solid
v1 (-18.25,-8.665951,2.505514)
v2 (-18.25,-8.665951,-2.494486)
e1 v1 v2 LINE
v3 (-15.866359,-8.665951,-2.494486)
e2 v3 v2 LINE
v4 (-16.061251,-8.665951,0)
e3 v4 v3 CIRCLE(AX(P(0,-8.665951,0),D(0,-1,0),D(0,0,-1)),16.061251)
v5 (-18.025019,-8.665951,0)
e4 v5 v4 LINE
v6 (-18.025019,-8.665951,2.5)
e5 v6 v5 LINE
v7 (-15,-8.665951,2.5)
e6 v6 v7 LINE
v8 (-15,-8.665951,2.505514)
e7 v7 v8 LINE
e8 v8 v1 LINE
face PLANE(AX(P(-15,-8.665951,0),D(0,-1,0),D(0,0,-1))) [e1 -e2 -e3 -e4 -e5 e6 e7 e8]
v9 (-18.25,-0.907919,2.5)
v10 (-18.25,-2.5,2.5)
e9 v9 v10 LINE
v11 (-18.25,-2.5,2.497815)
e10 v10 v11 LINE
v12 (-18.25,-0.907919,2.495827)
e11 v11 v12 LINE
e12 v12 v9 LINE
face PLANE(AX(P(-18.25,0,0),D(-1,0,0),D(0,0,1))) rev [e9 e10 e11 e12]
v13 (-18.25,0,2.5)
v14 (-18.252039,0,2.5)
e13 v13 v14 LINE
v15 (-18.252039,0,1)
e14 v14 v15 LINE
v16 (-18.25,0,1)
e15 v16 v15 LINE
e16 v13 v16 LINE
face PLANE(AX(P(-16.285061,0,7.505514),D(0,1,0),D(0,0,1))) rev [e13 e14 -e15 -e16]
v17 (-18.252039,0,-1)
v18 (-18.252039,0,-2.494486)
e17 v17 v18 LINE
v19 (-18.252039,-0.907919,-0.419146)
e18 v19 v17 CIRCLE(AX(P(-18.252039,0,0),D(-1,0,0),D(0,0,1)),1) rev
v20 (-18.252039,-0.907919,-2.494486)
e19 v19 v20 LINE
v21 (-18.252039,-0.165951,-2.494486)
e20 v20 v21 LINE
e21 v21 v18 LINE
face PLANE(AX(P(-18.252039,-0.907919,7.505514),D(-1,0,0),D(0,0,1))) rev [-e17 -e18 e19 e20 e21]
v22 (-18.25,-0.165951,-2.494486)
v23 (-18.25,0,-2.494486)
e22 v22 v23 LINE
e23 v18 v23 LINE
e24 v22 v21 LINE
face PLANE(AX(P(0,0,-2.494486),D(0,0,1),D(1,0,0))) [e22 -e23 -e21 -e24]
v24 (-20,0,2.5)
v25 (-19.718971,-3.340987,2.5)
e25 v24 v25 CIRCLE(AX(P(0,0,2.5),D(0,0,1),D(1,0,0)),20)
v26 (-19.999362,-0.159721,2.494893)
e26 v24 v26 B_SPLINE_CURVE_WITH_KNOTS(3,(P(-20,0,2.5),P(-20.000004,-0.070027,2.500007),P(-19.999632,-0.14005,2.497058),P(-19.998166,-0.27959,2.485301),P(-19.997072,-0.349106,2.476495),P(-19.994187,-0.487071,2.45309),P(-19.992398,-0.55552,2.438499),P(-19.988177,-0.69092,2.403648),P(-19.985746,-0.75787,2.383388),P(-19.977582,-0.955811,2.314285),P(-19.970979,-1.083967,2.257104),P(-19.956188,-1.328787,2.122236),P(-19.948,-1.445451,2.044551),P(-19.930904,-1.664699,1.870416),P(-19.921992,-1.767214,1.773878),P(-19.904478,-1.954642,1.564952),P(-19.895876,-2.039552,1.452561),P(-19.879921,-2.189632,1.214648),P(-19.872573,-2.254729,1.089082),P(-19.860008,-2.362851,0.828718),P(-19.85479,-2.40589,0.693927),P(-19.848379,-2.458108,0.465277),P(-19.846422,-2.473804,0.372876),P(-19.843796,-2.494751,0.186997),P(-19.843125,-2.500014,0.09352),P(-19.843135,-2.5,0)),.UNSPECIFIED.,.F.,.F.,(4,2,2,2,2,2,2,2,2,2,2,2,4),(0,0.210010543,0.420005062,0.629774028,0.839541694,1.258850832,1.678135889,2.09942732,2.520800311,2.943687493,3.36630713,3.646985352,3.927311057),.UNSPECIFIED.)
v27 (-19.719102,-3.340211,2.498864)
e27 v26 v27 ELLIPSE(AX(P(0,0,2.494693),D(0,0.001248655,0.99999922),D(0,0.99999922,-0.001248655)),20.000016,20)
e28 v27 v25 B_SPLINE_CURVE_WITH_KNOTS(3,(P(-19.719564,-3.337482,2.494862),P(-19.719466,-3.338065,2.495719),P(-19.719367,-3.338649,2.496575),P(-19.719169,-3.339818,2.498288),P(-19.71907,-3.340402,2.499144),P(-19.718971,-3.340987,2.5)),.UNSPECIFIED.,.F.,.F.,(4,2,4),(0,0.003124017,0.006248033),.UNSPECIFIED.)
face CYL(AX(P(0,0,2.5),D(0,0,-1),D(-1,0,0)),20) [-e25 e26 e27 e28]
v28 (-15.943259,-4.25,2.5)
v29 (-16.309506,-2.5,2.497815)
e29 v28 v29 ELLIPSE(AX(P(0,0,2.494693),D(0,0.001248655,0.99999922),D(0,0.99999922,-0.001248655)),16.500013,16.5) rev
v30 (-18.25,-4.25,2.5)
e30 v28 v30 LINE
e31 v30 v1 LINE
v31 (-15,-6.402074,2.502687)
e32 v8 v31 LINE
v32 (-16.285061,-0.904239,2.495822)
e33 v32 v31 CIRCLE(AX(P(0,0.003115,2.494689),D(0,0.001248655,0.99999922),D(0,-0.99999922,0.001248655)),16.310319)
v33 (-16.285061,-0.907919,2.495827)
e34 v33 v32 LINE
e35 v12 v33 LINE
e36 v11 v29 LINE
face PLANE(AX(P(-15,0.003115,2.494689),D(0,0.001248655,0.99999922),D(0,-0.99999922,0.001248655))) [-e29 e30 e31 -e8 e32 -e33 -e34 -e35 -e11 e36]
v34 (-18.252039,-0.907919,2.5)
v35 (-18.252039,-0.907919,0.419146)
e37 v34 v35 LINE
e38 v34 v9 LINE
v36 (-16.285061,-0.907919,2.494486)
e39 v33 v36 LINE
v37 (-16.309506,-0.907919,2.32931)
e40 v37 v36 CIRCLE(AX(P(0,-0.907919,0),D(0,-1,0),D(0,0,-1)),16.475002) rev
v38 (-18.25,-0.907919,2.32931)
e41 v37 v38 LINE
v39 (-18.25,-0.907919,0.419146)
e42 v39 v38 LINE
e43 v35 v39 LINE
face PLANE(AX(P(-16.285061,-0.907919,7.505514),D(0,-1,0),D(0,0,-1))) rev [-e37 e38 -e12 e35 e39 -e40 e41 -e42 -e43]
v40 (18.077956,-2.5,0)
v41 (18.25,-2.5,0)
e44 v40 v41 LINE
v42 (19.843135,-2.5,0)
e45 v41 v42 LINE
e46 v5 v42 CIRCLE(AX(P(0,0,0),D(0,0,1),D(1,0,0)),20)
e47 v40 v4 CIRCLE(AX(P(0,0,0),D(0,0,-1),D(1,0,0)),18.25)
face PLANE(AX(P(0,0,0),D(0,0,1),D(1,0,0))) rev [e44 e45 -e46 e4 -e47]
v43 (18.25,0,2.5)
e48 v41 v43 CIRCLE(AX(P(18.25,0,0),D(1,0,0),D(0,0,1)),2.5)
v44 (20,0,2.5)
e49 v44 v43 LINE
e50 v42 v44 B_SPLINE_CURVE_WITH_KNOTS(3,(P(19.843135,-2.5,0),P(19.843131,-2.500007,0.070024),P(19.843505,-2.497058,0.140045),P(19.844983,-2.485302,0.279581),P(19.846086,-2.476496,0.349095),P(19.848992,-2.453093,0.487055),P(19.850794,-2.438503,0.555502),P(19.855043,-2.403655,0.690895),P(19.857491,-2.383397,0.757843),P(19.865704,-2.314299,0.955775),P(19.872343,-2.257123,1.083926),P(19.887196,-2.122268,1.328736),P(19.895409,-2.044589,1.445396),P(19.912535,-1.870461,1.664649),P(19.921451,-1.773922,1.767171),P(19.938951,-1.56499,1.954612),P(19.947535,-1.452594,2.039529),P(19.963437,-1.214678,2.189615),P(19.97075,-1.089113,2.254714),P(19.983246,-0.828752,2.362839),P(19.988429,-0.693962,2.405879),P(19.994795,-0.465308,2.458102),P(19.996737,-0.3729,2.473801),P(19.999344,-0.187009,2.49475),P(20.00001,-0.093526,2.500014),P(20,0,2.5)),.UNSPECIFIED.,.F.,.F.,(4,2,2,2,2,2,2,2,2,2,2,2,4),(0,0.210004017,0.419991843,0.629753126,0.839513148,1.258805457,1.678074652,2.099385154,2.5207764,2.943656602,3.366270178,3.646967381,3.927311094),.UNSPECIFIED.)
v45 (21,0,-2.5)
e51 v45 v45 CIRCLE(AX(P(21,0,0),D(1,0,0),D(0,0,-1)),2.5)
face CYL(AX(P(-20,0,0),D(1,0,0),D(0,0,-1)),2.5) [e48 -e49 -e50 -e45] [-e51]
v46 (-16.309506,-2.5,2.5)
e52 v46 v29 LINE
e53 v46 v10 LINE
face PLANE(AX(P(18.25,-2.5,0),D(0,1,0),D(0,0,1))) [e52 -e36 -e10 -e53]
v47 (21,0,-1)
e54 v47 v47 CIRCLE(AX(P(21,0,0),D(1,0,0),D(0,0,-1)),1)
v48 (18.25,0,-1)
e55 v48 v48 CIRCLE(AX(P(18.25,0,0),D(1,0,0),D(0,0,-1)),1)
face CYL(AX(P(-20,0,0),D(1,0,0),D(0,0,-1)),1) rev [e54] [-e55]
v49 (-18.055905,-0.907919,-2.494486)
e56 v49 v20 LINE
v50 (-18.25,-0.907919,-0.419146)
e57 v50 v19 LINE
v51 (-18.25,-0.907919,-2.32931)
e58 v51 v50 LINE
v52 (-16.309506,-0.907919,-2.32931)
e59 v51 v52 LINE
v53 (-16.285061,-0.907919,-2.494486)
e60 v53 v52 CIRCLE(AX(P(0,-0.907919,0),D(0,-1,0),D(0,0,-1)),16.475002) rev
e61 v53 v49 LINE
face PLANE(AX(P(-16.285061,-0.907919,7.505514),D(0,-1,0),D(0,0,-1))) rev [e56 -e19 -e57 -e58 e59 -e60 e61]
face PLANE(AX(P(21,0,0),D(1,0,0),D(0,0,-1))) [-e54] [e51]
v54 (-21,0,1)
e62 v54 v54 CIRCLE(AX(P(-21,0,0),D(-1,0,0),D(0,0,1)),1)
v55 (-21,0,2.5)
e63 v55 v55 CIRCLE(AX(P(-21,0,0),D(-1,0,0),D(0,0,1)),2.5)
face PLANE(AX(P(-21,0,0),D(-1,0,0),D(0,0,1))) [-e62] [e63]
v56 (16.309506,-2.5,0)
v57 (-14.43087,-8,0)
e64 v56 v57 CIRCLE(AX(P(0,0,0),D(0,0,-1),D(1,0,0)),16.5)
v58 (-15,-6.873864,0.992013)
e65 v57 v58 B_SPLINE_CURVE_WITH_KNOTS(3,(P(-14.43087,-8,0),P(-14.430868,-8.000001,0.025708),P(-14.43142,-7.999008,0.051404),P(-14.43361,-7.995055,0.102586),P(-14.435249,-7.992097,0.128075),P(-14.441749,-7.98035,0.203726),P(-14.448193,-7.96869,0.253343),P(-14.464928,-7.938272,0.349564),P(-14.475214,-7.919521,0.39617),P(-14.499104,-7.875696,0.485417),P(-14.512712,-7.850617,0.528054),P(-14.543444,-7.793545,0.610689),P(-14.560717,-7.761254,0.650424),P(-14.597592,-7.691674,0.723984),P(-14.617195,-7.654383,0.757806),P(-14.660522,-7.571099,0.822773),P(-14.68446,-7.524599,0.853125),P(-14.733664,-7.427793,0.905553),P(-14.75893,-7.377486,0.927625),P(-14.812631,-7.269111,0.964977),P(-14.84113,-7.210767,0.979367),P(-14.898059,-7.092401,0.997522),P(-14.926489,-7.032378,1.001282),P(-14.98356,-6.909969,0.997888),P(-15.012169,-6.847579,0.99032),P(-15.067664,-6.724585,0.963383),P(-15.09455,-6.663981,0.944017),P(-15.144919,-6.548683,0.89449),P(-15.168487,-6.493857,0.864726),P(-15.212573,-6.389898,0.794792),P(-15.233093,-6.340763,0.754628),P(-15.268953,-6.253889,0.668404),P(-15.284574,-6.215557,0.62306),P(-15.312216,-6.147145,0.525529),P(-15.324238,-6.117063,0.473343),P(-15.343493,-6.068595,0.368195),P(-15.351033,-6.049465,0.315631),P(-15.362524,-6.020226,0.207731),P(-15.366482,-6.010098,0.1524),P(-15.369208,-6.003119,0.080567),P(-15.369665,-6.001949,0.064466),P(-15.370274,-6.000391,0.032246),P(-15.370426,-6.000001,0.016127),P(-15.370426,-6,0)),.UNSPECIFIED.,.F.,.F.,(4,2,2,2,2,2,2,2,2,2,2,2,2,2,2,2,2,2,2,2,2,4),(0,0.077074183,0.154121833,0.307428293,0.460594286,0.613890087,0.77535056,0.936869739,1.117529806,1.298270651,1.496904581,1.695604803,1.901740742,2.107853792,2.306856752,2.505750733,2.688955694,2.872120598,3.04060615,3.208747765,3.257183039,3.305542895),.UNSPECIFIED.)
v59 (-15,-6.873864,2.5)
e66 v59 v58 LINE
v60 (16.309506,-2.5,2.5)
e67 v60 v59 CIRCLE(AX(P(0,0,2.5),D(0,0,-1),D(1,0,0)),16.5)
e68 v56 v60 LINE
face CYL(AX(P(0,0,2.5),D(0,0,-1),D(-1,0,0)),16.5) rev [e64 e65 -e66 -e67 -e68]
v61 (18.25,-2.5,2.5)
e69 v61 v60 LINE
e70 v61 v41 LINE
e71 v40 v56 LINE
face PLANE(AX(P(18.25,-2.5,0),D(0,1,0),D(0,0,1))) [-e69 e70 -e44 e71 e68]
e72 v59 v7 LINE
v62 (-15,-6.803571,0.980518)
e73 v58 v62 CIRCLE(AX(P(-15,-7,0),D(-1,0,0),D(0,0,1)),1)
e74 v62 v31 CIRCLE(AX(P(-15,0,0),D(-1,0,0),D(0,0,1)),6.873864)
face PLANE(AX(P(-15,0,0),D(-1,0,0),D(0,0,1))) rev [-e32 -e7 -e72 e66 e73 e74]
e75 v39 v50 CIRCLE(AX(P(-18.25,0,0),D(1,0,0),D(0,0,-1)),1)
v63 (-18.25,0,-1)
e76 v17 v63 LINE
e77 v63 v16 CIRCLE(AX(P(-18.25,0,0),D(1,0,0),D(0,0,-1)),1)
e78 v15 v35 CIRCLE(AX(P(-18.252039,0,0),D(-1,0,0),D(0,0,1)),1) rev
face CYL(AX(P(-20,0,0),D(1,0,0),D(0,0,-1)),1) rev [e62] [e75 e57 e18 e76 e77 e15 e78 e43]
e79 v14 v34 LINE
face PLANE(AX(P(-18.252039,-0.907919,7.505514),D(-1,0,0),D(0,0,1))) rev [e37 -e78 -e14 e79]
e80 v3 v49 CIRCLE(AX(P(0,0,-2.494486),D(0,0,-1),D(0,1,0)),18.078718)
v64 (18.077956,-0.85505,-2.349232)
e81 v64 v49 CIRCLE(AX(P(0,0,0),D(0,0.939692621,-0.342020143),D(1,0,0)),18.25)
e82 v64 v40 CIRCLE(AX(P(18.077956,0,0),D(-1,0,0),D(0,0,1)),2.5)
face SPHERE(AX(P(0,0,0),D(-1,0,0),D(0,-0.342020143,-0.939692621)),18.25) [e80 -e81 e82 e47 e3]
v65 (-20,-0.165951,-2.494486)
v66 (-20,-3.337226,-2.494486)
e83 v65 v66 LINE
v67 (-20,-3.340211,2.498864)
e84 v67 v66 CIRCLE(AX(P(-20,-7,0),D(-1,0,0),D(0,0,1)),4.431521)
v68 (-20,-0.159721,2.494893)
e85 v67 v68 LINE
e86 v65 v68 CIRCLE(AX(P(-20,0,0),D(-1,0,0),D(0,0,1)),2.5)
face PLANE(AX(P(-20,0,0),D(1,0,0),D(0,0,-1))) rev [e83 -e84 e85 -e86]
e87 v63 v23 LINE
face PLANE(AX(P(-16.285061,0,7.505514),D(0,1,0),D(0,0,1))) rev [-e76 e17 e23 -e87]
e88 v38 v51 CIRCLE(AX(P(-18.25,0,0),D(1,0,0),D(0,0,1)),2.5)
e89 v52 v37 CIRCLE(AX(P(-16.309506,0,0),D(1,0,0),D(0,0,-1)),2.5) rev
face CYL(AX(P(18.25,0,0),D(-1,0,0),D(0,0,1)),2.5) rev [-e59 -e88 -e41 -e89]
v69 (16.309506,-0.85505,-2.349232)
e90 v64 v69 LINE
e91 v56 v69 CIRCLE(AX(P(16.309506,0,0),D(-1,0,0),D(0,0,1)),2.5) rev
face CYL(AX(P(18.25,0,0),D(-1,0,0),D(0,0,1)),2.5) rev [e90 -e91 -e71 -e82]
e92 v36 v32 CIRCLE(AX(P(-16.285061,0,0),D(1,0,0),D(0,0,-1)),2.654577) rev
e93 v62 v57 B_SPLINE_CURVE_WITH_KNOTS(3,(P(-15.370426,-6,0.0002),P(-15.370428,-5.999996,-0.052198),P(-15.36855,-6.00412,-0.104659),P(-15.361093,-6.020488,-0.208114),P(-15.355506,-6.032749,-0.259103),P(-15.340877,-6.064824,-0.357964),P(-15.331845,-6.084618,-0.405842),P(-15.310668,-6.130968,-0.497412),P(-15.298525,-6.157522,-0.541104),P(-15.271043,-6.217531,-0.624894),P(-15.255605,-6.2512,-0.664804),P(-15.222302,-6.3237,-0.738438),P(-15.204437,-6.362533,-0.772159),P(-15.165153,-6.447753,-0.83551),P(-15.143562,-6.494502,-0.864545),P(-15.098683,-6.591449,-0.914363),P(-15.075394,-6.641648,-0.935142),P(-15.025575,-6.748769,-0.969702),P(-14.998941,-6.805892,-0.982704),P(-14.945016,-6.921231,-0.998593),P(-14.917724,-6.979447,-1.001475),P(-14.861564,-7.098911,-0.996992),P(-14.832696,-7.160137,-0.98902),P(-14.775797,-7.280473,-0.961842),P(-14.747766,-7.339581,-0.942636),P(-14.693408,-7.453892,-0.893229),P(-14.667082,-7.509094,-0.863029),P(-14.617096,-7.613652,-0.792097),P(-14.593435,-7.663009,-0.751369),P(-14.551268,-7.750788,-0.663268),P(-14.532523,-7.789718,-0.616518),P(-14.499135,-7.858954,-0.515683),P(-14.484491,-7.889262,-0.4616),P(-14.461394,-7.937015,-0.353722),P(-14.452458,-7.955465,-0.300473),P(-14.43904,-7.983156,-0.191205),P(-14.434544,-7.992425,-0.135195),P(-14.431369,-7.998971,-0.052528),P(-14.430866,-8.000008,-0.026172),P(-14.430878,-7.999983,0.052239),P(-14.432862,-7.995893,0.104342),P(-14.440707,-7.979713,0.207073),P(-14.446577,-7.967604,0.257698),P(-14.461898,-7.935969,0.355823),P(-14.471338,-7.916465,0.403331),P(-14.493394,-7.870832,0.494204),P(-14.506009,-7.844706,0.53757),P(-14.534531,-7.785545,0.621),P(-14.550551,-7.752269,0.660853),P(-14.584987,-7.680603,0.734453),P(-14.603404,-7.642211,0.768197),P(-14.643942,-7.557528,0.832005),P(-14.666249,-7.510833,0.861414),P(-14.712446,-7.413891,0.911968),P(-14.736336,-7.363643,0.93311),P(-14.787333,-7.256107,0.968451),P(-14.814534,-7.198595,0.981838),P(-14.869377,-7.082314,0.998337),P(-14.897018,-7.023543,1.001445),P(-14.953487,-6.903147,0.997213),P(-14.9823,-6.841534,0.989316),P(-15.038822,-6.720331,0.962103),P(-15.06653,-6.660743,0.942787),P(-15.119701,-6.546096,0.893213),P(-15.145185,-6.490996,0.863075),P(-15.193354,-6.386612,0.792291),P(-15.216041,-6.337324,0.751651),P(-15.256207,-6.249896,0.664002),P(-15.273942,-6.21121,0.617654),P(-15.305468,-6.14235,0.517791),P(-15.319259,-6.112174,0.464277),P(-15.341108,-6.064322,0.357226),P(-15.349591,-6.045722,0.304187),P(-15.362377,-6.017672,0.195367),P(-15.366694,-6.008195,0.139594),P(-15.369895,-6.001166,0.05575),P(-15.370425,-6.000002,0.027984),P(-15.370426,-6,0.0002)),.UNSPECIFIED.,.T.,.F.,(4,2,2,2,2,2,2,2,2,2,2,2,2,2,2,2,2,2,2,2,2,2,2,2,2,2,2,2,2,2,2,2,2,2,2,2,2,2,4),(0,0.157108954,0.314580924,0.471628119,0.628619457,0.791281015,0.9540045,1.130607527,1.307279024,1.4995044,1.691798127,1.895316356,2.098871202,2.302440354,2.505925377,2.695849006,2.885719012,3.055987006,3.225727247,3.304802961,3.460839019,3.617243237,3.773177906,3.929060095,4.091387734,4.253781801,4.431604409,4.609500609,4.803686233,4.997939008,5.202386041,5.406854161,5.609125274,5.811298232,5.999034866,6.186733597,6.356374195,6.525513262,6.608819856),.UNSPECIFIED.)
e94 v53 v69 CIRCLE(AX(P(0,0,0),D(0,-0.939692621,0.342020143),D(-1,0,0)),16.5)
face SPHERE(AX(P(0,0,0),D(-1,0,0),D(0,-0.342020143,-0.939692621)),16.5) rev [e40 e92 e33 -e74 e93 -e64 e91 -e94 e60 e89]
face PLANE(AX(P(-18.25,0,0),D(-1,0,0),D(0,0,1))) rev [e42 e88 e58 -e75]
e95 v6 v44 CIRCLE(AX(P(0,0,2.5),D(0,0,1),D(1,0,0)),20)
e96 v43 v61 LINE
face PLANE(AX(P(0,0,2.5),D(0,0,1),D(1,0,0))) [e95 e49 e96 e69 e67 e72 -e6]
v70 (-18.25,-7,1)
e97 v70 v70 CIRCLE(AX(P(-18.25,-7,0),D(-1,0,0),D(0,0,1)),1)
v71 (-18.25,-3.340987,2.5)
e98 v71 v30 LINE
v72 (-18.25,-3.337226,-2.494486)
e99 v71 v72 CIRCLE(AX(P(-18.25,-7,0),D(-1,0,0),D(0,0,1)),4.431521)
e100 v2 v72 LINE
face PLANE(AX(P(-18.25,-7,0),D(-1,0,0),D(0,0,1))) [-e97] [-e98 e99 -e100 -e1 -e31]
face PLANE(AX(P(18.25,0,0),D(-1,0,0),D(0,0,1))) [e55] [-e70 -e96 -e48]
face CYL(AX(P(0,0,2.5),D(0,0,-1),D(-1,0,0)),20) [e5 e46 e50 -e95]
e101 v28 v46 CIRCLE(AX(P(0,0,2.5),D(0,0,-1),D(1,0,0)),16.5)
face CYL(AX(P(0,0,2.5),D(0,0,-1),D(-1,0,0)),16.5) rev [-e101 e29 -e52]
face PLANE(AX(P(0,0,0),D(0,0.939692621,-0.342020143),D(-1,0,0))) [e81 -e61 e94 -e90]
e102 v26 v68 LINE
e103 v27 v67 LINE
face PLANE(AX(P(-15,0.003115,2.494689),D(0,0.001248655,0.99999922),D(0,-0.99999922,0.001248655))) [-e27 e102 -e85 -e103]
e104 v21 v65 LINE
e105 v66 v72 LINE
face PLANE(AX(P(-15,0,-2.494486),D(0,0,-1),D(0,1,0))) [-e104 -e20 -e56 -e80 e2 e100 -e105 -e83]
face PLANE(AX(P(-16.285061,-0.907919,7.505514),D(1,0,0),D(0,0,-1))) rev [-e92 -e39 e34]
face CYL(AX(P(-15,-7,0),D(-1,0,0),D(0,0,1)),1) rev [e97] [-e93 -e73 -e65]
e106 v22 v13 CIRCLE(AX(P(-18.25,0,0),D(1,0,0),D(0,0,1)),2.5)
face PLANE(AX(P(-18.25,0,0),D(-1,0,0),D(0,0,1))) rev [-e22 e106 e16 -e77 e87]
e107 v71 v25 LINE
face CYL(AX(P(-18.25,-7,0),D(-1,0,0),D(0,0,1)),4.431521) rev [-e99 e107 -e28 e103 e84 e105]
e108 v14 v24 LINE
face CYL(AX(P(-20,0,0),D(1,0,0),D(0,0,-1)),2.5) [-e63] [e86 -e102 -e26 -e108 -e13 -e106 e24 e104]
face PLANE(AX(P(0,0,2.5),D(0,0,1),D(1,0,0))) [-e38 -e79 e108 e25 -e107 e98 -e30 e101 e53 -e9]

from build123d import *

# Parameters (mm, degrees)
EXTRUDE_1_DEPTH          = 2.5
REVOLVE_1_ANGLE          = 70
EXTRUDE_2_DEPTH          = 20
EXTRUDE_2_DEPTH_BACK     = 20
SKETCH_4_R               = 2.5
SKETCH_4_R_2             = 1
CUT_EXTRUDE_1_DEPTH      = 18.25
CUT_EXTRUDE_1_DEPTH_BACK = 18.25
SKETCH_5_R               = 1
CUT_EXTRUDE_START        = -100
SKETCH_6_R               = 1
CUT_EXTRUDE_2_DEPTH      = 100
SKETCH_11_R              = 2.5
SKETCH_11_R_2            = 1
EXTRUDE_5_DEPTH          = 1
SKETCH_12_R              = 1
EXTRUDE_6_DEPTH          = 5
SKETCH_13_R              = 1
CUT_EXTRUDE_4_DEPTH      = 10
EXTRUDE_START            = 1
SKETCH_14_R              = 2.5
SKETCH_14_R_2            = 1
EXTRUDE_7_DEPTH          = 1
SKETCH_18_W              = 1.966978086
SKETCH_18_H              = 0.907918652
CUT_EXTRUDE_7_DEPTH      = 10
SKETCH_19_R              = 4.431520752
SKETCH_19_R_2            = 1
CUT_EXTRUDE_8_DEPTH      = 1.75


with BuildPart() as part:
    # 草图1 → 凸台-拉伸1 (new body)
    with BuildSketch(Plane.XY):
        with BuildLine():
            Line((-20, 0), (-16.5, 0))
            ThreePointArc((-16.5, 0), (0, -16.5), (16.5, 0))
            Line((16.5, 0), (20, 0))
            ThreePointArc((20, 0), (0, -20), (-20, 0))
        make_face()
    extrude(amount=EXTRUDE_1_DEPTH)

    # 草图2 → 旋转1 (revolve)
    with BuildSketch(Plane(origin=(0, 0, 0), x_dir=(-1, 0, 0), z_dir=(0, 0, -1))):
        with BuildLine():
            Line((-18.25, 0), (-16.5, 0))
            ThreePointArc((-16.5, 0), (0, -16.5), (16.5, 0))
            Line((16.5, 0), (18.25, 0))
            ThreePointArc((18.25, 0), (0, -18.25), (-18.25, 0))
        make_face()
    revolve(axis=Axis((16.5, 0, 0), (1, 0, 0)), revolution_arc=REVOLVE_1_ANGLE)

    # 草图4 → 凸台-拉伸2 (add, two sides: drawn at the far end of the back side and taken through both)
    with BuildSketch(Plane(origin=(0, 0, 0), x_dir=(0, 0, -1), z_dir=(1, 0, 0)).offset(-EXTRUDE_2_DEPTH_BACK)):
        Circle(SKETCH_4_R)
        Circle(SKETCH_4_R_2, mode=Mode.SUBTRACT)
    extrude(amount=EXTRUDE_2_DEPTH + EXTRUDE_2_DEPTH_BACK)

    # 草图5 → 切除-拉伸1 (cut, two sides: drawn at the far end of the back side and taken through both)
    with BuildSketch(Plane(origin=(0, 0, 0), x_dir=(0, 0, -1), z_dir=(1, 0, 0)).offset(-CUT_EXTRUDE_1_DEPTH_BACK)):
        with BuildLine():
            Line((0, -2.5), (-2.5, -2.5))
            Line((-2.5, -2.5), (-2.5, 0))
            ThreePointArc((-2.5, 0), (1.767766953, 1.767766953), (0, -2.5))
        make_face()
        Circle(SKETCH_5_R, mode=Mode.SUBTRACT)
    extrude(amount=CUT_EXTRUDE_1_DEPTH + CUT_EXTRUDE_1_DEPTH_BACK, mode=Mode.SUBTRACT)

    # 草图6 → 切除-拉伸2 (cut)
    with BuildSketch(Plane(origin=(20, 0, 0), x_dir=(0, 0, -1), z_dir=(1, 0, 0)).offset(CUT_EXTRUDE_START)):
        Circle(SKETCH_6_R)
    extrude(amount=CUT_EXTRUDE_2_DEPTH, mode=Mode.SUBTRACT)

    # 草图11 → 凸台-拉伸5 (add)
    with BuildSketch(Plane(origin=(20, 0, 0), x_dir=(0, 0, -1), z_dir=(1, 0, 0))):
        Circle(SKETCH_11_R)
        Circle(SKETCH_11_R_2, mode=Mode.SUBTRACT)
    extrude(amount=EXTRUDE_5_DEPTH)

    # 草图12 → 凸台-拉伸6 (add)
    with BuildSketch(Plane.ZY.offset(20)):
        with BuildLine():
            ThreePointArc((2.494892647, -0.15972063), (0.003121638, -2.499998051), (-2.494485996, -0.165950649))
            Line((-2.494485996, -0.165950649), (-2.494485996, -8.665950649))
            Line((-2.494485996, -8.665950649), (2.505514004, -8.665950649))
            Line((2.505514004, -8.665950649), (2.494892647, -0.15972063))
        make_face()
        with Locations((0, -7)):
            Circle(SKETCH_12_R, mode=Mode.SUBTRACT)
    extrude(amount=-EXTRUDE_6_DEPTH)

    # 草图13 → 切除-拉伸4 (cut)
    with BuildSketch(Plane.ZY.offset(20)):
        with Locations((0, -7)):
            Circle(SKETCH_13_R)
    extrude(amount=-CUT_EXTRUDE_4_DEPTH, mode=Mode.SUBTRACT)

    # 草图14 → 凸台-拉伸7 (add)
    with BuildSketch(Plane.ZY.offset(20).offset(EXTRUDE_START)):
        Circle(SKETCH_14_R)
        Circle(SKETCH_14_R_2, mode=Mode.SUBTRACT)
    extrude(amount=-EXTRUDE_7_DEPTH)

    # 草图16 → 切除-旋转1 (revolve, cut)
    with BuildSketch(Plane.XY):
        with BuildLine():
            Line((16.5, 0), (-16.5, 0))
            ThreePointArc((-16.5, 0), (0, -16.5), (16.5, 0))
        make_face()
    revolve(axis=Axis((0, 0, 0), (1, 0, 0)), mode=Mode.SUBTRACT)

    # 草图18 → 切除-拉伸7 (cut)
    with BuildSketch(Plane(origin=(0, 0, -2.494485996), x_dir=(-1, 0, 0), z_dir=(0, 0, -1))):
        with Locations((17.268550398, -0.453959326)):
            Rectangle(SKETCH_18_W, SKETCH_18_H)
    extrude(amount=-CUT_EXTRUDE_7_DEPTH, mode=Mode.SUBTRACT)

    # 草图19 → 切除-拉伸8 (cut)
    with BuildSketch(Plane.ZY.offset(20)):
        with Locations((0, -7)):
            Circle(SKETCH_19_R)
        with Locations((0, -7)):
            Circle(SKETCH_19_R_2, mode=Mode.SUBTRACT)
    extrude(amount=-CUT_EXTRUDE_8_DEPTH, mode=Mode.SUBTRACT)


solid = part.part
